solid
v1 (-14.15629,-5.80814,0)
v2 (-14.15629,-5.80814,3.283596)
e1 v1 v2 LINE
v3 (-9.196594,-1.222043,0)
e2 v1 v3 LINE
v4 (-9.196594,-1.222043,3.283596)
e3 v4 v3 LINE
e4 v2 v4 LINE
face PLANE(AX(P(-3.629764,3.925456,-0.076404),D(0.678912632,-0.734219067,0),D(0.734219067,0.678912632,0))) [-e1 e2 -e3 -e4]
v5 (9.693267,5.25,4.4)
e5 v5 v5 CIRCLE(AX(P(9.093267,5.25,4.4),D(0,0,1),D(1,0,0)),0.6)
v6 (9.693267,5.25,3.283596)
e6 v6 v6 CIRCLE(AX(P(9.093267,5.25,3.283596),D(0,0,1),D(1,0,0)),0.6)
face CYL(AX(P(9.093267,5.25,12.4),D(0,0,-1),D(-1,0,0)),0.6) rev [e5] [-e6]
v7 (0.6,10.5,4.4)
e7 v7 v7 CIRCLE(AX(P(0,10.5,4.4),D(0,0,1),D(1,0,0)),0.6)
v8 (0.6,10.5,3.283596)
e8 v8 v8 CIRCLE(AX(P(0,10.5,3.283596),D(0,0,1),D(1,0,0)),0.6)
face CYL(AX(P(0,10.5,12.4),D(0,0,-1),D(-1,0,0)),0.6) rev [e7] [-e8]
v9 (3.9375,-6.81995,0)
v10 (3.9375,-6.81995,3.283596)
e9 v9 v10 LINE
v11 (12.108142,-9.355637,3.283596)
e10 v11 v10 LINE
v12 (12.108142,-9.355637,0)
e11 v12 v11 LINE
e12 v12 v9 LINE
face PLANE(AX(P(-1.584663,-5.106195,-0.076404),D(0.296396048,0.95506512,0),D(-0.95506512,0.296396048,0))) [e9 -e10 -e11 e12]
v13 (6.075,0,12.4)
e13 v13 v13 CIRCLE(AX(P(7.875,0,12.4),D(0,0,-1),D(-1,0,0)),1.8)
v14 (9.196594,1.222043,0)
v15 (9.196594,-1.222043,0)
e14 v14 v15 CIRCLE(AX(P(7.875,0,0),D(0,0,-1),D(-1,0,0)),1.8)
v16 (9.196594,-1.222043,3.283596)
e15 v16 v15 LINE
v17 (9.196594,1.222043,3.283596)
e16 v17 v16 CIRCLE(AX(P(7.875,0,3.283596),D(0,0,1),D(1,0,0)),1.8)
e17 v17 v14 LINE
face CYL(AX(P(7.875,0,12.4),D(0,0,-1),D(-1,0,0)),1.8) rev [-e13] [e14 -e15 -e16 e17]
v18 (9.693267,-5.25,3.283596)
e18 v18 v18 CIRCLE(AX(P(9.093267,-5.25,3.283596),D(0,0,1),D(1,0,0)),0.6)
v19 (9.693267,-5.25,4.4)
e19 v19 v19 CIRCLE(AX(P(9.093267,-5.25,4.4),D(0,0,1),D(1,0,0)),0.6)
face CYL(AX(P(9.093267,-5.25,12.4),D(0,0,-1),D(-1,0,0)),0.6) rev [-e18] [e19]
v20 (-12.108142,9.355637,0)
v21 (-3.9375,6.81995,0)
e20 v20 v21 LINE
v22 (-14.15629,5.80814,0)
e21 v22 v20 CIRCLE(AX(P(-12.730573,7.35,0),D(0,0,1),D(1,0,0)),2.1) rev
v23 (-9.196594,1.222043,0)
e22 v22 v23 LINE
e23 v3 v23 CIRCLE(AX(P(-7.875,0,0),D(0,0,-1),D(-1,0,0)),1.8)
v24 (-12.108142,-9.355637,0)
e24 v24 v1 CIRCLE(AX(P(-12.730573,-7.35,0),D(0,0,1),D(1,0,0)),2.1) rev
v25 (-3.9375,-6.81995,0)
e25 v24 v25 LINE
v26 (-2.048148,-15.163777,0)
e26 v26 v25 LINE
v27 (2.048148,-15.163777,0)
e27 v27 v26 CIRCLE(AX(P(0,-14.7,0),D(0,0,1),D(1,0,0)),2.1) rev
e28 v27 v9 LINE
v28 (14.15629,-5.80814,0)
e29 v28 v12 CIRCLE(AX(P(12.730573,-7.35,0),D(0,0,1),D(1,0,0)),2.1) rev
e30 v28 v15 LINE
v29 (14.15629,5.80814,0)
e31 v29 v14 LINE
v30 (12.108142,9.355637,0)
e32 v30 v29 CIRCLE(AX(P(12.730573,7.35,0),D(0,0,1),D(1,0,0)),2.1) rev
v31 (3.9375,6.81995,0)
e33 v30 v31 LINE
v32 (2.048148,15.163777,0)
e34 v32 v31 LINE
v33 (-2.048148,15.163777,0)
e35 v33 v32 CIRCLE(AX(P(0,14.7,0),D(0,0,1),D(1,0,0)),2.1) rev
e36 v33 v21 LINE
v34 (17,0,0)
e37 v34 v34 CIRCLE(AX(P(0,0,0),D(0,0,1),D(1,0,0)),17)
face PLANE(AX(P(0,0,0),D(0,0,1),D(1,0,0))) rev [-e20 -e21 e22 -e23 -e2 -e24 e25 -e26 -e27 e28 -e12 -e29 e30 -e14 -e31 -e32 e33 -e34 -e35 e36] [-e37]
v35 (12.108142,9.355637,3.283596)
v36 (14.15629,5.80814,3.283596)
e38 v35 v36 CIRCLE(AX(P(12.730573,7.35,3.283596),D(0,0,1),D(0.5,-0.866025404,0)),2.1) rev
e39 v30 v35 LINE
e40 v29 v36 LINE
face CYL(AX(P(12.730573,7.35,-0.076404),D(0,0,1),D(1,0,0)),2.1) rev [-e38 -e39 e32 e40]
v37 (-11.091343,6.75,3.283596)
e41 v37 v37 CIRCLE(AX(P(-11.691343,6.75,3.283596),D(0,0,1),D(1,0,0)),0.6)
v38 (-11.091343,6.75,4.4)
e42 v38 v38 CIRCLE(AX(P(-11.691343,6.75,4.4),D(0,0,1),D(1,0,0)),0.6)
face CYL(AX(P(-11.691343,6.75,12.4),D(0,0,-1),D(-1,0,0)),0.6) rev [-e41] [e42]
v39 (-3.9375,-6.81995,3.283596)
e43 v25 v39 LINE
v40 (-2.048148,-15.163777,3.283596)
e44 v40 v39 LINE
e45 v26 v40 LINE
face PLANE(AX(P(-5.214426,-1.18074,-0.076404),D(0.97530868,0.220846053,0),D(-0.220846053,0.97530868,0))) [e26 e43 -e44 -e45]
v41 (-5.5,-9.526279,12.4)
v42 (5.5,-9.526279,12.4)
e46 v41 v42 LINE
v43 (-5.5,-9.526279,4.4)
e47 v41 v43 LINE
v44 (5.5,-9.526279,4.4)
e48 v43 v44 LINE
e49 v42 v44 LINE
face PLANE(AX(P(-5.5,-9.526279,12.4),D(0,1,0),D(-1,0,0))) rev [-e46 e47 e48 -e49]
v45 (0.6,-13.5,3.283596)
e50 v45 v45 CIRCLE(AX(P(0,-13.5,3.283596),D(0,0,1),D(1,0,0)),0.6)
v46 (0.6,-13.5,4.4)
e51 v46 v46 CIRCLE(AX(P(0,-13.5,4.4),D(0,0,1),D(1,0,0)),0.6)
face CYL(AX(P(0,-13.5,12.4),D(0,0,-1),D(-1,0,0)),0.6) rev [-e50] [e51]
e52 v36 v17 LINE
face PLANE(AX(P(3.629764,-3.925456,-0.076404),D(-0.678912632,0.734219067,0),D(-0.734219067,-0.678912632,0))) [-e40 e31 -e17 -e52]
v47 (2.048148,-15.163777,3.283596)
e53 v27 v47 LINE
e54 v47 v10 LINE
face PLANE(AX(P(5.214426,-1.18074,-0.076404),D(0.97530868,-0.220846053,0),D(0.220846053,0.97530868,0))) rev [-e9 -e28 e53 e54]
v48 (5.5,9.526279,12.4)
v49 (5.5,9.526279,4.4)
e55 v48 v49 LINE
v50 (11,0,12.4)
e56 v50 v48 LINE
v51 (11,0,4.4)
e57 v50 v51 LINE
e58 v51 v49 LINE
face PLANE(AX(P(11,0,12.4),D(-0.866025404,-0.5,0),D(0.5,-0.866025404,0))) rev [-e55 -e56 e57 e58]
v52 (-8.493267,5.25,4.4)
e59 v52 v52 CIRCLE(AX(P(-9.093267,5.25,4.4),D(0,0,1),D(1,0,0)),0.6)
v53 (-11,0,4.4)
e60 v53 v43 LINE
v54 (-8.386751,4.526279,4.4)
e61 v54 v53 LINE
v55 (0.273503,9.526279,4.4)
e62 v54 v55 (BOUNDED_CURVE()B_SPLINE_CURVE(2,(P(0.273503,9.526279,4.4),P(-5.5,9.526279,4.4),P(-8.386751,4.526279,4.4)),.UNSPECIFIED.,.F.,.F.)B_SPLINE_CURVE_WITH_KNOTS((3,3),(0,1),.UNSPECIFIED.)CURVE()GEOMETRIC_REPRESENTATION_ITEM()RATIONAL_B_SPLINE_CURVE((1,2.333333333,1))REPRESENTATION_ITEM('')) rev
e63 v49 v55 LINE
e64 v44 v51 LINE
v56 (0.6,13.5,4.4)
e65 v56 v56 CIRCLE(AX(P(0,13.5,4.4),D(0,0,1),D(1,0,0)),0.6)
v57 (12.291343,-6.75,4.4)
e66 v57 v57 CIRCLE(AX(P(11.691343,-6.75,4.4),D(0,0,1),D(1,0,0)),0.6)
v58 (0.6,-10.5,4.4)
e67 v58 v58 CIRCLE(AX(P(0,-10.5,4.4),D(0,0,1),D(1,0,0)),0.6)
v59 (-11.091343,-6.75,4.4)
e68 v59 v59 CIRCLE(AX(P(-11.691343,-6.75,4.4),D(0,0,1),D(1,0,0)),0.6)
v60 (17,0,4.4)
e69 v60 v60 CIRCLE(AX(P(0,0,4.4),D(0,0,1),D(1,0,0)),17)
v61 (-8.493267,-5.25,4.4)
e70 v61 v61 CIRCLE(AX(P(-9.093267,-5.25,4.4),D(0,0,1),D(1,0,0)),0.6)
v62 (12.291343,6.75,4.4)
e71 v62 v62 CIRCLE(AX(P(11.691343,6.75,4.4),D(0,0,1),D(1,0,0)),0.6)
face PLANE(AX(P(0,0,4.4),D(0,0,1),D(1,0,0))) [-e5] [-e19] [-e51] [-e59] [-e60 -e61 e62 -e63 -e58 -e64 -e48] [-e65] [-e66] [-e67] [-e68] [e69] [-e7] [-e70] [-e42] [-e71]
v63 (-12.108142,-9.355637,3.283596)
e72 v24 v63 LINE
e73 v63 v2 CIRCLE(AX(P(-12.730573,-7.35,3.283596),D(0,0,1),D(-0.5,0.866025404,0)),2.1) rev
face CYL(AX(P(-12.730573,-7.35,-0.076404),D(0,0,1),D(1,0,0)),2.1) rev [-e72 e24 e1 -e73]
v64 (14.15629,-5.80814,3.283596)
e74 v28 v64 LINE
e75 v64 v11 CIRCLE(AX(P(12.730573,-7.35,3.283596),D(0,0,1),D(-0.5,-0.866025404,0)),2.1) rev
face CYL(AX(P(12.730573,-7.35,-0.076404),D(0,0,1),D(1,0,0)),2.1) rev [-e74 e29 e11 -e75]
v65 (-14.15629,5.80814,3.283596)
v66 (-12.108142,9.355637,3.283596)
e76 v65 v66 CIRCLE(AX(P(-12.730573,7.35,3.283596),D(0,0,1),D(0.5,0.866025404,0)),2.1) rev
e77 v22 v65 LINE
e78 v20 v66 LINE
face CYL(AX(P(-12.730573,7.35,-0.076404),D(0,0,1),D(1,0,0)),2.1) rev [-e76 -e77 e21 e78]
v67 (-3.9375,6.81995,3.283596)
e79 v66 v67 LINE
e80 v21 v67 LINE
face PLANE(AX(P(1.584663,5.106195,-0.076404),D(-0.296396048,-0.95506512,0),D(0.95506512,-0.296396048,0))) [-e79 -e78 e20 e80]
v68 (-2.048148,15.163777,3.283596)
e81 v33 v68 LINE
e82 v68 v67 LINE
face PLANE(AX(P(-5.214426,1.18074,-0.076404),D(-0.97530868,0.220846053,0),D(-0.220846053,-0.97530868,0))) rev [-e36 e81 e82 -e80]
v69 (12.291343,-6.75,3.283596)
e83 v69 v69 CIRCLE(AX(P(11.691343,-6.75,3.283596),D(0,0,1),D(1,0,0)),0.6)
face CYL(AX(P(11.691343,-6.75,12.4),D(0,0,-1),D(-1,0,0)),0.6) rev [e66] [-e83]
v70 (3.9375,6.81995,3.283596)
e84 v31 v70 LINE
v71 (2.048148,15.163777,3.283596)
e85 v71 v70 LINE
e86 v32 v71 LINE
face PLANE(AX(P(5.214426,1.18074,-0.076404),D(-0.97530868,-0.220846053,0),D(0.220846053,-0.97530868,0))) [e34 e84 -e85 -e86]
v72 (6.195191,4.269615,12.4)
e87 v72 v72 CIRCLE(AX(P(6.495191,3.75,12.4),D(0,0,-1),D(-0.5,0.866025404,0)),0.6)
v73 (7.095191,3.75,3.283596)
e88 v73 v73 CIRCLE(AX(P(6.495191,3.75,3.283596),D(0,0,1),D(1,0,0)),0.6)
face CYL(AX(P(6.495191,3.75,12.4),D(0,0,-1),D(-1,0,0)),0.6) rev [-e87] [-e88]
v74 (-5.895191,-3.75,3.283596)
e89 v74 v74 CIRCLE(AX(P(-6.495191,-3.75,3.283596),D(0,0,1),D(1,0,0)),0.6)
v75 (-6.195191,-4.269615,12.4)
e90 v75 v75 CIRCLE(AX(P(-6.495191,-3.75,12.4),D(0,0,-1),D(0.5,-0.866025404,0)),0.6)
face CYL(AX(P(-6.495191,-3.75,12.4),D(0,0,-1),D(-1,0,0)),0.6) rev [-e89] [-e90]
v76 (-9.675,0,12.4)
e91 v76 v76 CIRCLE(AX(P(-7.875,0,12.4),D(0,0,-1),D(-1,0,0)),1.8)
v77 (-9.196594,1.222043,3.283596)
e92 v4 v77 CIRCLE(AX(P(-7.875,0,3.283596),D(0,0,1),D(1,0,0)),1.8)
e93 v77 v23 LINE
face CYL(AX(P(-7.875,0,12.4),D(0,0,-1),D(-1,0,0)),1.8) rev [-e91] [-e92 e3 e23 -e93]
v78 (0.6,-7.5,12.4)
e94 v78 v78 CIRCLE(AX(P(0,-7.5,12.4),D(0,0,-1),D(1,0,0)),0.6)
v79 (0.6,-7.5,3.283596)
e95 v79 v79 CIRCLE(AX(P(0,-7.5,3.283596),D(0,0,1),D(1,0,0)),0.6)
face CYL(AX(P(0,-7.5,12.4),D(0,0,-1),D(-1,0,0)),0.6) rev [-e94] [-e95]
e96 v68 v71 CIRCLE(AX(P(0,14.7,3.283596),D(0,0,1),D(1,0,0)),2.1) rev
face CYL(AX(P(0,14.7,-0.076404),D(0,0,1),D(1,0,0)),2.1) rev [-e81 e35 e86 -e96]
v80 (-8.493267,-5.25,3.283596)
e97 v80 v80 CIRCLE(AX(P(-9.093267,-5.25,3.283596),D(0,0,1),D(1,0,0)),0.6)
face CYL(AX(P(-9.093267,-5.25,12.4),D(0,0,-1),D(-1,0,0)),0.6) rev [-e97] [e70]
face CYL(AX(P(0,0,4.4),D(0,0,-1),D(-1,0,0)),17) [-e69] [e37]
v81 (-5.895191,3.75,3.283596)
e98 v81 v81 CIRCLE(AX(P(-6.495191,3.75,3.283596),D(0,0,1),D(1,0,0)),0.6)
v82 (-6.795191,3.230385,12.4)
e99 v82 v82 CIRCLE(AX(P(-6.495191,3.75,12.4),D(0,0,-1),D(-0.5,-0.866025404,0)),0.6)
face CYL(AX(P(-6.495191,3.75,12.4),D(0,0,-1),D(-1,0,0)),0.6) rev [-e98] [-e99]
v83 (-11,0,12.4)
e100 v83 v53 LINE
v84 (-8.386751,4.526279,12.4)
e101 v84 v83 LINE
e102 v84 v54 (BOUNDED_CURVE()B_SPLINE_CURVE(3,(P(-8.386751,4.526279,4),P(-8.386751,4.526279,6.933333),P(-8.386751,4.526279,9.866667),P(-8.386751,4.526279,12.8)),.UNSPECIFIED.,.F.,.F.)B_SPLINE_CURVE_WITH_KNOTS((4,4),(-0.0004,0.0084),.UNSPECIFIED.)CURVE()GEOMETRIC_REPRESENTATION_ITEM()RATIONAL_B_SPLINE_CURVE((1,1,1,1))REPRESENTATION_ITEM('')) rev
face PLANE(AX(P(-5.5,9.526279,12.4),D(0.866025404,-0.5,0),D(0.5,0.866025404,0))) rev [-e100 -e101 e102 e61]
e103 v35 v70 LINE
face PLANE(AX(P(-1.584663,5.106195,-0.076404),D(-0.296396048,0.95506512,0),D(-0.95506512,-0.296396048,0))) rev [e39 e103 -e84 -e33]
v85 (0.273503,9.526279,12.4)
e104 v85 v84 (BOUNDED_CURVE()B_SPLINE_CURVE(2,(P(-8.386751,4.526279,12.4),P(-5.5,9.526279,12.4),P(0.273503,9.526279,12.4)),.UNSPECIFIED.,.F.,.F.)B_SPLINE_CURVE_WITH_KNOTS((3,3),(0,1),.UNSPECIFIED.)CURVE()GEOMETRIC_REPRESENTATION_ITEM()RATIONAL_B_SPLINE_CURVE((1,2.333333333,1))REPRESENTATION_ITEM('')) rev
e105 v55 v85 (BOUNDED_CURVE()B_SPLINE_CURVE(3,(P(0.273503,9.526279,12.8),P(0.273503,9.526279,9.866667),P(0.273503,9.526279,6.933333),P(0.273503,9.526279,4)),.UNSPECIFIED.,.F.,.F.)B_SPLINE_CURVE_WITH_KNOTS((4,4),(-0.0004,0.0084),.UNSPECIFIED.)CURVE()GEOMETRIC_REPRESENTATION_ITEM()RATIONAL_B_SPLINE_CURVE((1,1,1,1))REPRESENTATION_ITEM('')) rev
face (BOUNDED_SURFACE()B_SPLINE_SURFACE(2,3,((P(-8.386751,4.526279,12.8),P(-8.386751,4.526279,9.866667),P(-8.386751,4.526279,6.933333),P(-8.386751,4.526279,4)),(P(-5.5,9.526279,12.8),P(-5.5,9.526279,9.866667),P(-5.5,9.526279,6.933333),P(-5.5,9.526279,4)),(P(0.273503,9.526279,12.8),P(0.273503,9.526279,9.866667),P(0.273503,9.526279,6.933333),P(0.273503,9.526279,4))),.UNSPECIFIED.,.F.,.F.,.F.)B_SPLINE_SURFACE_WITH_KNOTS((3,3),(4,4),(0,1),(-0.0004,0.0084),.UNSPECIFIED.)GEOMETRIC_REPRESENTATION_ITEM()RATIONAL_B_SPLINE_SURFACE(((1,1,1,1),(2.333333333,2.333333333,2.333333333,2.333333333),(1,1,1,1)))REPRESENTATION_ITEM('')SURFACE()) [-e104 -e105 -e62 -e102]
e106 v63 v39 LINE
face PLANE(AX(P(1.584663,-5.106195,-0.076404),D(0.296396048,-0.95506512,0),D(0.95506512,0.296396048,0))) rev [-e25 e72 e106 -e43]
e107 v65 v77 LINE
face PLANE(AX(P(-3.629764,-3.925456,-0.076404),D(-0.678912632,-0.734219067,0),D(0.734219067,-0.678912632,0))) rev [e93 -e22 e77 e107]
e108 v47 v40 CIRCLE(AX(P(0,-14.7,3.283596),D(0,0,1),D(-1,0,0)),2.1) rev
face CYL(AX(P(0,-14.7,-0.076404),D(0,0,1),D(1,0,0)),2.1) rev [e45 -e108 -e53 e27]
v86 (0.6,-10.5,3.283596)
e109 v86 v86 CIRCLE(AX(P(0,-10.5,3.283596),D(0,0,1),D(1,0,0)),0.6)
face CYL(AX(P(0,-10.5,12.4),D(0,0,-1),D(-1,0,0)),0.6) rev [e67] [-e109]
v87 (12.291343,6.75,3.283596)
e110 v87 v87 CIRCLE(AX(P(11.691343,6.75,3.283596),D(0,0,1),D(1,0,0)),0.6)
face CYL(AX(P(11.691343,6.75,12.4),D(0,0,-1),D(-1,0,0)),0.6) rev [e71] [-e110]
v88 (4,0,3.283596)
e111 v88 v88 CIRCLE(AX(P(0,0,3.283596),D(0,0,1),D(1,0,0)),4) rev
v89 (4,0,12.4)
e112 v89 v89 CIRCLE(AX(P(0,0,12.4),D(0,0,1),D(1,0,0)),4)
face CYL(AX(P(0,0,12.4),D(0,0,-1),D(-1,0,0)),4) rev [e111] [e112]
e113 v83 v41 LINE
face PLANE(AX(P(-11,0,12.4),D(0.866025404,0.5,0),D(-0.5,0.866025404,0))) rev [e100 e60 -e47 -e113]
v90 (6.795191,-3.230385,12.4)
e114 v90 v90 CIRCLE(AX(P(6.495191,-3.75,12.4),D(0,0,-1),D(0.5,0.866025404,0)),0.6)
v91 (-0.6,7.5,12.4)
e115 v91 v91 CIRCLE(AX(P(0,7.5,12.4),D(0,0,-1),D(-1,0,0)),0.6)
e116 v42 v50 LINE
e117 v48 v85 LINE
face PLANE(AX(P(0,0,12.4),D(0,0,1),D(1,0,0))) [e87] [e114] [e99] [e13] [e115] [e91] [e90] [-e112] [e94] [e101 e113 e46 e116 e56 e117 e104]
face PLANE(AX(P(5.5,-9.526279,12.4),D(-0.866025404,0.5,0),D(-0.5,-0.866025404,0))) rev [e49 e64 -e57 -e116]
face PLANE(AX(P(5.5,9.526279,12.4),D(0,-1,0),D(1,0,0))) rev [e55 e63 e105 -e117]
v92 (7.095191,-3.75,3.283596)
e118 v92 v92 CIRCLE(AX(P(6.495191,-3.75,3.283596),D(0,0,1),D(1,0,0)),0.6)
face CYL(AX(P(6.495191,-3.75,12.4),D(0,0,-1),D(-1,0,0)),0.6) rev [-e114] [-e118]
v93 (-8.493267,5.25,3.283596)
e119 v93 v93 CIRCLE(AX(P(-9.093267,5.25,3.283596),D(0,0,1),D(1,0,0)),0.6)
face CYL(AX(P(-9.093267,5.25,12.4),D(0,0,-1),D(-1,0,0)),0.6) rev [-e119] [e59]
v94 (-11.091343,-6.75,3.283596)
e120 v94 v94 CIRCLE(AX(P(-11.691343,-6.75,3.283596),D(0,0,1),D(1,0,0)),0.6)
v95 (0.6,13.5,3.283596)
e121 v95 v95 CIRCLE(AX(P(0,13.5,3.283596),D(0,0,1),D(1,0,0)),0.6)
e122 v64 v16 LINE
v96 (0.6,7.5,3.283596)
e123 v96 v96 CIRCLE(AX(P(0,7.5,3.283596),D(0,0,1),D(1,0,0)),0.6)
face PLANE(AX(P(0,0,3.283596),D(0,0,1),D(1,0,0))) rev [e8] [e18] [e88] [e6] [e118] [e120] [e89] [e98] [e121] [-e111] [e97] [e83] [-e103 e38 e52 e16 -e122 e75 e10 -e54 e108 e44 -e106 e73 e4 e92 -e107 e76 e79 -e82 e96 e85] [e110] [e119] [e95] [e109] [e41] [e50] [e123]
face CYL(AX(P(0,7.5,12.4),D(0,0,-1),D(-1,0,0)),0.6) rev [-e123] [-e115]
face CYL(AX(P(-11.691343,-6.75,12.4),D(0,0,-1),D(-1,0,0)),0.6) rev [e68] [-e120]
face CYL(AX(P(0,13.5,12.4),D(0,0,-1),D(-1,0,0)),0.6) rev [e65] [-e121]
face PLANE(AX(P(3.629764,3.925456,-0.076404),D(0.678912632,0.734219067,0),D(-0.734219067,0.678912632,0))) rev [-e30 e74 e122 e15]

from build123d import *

# Parameters (mm, degrees)
SKETCH1_R               = 17
BOSS_EXTRUDE1_DEPTH     = 4.4
CAVITY1_OUTLINE_R       = 3.15
CAVITY1_DEPTH           = 3.283595969
CAVITY1_START           = 1.183595969
CAVITY1_2_OUTLINE_R     = 3.15
CAVITY1_2_OUTLINE_R_2   = 1.575
CAVITY1_2_DEPTH         = 2.1
BOSS_EXTRUDE8_DEPTH     = 8
SKETCH2_R               = 0.6
CUT_EXTRUDE1_DEPTH      = 28.051062826
CIRPATTERN1_COUNT       = 6
CUT_EXTRUDE2_START      = -3.283596
SKETCH3_R               = 4.596048158
CUT_EXTRUDE2_DEPTH      = 3.283596
CUT_EXTRUDE3_DEPTH      = 28.051062826
CUT_EXTRUDE3_DEPTH_BACK = 4
SKETCH4_R               = 4
SKETCH6_R               = 1.8
CUT_EXTRUDE4_DEPTH      = 28.051062826


with BuildPart() as part:
    # Sketch1 → Boss-Extrude1 (new body)
    with BuildSketch(Plane.XY):
        Circle(SKETCH1_R)
    extrude(amount=BOSS_EXTRUDE1_DEPTH)

    # Cavity1: read off the stored shape, not the designer's step
    # Cavity1 outline → Cavity1 (cut)
    with BuildSketch(Plane.XY):
        with BuildLine():
            Line((3.9375, 6.819950055), (2.048148228, 15.163776711))
            ThreePointArc((2.048148228, 15.163776711), (0, 16.8), (-2.048148228, 15.163776711))
            Line((-2.048148228, 15.163776711), (-3.9375, 6.819950055))
            Line((-3.9375, 6.819950055), (-12.108141735, 9.355636751))
            ThreePointArc((-12.108141735, 9.355636751), (-14.549226784, 8.4), (-14.156289963, 5.80813996))
            Line((-14.156289963, 5.80813996), (-7.875, 0))
            Line((-7.875, 0), (-14.156289963, -5.80813996))
            ThreePointArc((-14.156289963, -5.80813996), (-14.549226784, -8.4), (-12.108141735, -9.355636751))
            Line((-12.108141735, -9.355636751), (-3.9375, -6.819950055))
            Line((-3.9375, -6.819950055), (-2.048148228, -15.163776711))
            ThreePointArc((-2.048148228, -15.163776711), (0, -16.8), (2.048148228, -15.163776711))
            Line((2.048148228, -15.163776711), (3.9375, -6.819950055))
            Line((3.9375, -6.819950055), (12.108141735, -9.355636751))
            ThreePointArc((12.108141735, -9.355636751), (14.549226784, -8.4), (14.156289963, -5.80813996))
            Line((14.156289963, -5.80813996), (7.875, 0))
            Line((7.875, 0), (14.156289963, 5.80813996))
            ThreePointArc((14.156289963, 5.80813996), (14.549226784, 8.4), (12.108141735, 9.355636751))
            Line((12.108141735, 9.355636751), (3.9375, 6.819950055))
        make_face()
        Circle(CAVITY1_OUTLINE_R, mode=Mode.SUBTRACT)
    extrude(amount=CAVITY1_DEPTH, mode=Mode.SUBTRACT)

    # Cavity1 2 outline → Cavity1 2 (cut)
    with BuildSketch(Plane.XY.offset(CAVITY1_START)):
        Circle(CAVITY1_2_OUTLINE_R)
        Circle(CAVITY1_2_OUTLINE_R_2, mode=Mode.SUBTRACT)
    extrude(amount=CAVITY1_2_DEPTH, mode=Mode.SUBTRACT)

    # Sketch12 → Boss-Extrude8 (add)
    with BuildSketch(Plane.XY.offset(4.4)):
        Polygon((5.5, -9.526279442), (11, 0), (5.5, 9.526279442), (-5.5, 9.526279442), (-11, 0), (-5.5, -9.526279442), align=None)
    extrude(amount=BOSS_EXTRUDE8_DEPTH)

    # Sketch2 → Cut-Extrude1 (cut, through all)
    with BuildSketch(Plane(origin=(0, 0, 0), x_dir=(-1, 0, 0), z_dir=(0, 0, -1))):
        with Locations(Location((0, 13.5, 0), (0, 0, 180))):
            Circle(SKETCH2_R)
        with Locations(Location((0, 10.5, 0), (0, 0, 180))):
            Circle(SKETCH2_R)
        with Locations((0, 7.5)):
            Circle(SKETCH2_R)
    cut_extrude1 = extrude(amount=-CUT_EXTRUDE1_DEPTH, mode=Mode.SUBTRACT)

    # CirPattern1: Cut-Extrude1 ×6 about axis
    cirpattern1_axis = Axis((0, 0, 0), (0, 0, 1))
    for i in range(1, CIRPATTERN1_COUNT):
        add(cut_extrude1.rotate(cirpattern1_axis, i * 360 / CIRPATTERN1_COUNT), mode=Mode.SUBTRACT)

    # Sketch3 → Cut-Extrude2 (cut)
    with BuildSketch(Plane(origin=(0, 0, 0), x_dir=(-1, 0, 0), z_dir=(0, 0, -1)).offset(CUT_EXTRUDE2_START)):
        Circle(SKETCH3_R)
    extrude(amount=CUT_EXTRUDE2_DEPTH, mode=Mode.SUBTRACT)

    # Sketch4 → Cut-Extrude3 (cut, two sides: drawn at the far end of the back side and taken through both)
    with BuildSketch(Plane.XY.offset(-CUT_EXTRUDE3_DEPTH_BACK)):
        Circle(SKETCH4_R)
    extrude(amount=CUT_EXTRUDE3_DEPTH + CUT_EXTRUDE3_DEPTH_BACK, mode=Mode.SUBTRACT)

    # Sketch6 → Cut-Extrude4 (cut, through all)
    with BuildSketch(Plane(origin=(0, 0, 0), x_dir=(-1, 0, 0), z_dir=(0, 0, -1))):
        with Locations((-7.875, 0)):
            Circle(SKETCH6_R)
        with Locations((7.875, 0)):
            Circle(SKETCH6_R)
    extrude(amount=-CUT_EXTRUDE4_DEPTH, mode=Mode.SUBTRACT)

    # Fillet1
    # a fillet whose section is not a circle: 10 mm, written as the material it takes off along each edge
    with BuildSketch(Plane(origin=(-5.5, 9.526279442, 4.4), x_dir=(1, 0, 0), z_dir=(0, 0, 1))) as fillet1_piece_1:
        with BuildLine():
            Bezier((5.773502692, 0), (0, 0), (-2.886751346, -5), weights=[1, 2.333333333, 1])
            Line((-2.886751346, -5), (0, 0))
            Line((0, 0), (5.773502692, 0))
        make_face()
    extrude(amount=22.43375673, mode=Mode.SUBTRACT)


solid = part.part
